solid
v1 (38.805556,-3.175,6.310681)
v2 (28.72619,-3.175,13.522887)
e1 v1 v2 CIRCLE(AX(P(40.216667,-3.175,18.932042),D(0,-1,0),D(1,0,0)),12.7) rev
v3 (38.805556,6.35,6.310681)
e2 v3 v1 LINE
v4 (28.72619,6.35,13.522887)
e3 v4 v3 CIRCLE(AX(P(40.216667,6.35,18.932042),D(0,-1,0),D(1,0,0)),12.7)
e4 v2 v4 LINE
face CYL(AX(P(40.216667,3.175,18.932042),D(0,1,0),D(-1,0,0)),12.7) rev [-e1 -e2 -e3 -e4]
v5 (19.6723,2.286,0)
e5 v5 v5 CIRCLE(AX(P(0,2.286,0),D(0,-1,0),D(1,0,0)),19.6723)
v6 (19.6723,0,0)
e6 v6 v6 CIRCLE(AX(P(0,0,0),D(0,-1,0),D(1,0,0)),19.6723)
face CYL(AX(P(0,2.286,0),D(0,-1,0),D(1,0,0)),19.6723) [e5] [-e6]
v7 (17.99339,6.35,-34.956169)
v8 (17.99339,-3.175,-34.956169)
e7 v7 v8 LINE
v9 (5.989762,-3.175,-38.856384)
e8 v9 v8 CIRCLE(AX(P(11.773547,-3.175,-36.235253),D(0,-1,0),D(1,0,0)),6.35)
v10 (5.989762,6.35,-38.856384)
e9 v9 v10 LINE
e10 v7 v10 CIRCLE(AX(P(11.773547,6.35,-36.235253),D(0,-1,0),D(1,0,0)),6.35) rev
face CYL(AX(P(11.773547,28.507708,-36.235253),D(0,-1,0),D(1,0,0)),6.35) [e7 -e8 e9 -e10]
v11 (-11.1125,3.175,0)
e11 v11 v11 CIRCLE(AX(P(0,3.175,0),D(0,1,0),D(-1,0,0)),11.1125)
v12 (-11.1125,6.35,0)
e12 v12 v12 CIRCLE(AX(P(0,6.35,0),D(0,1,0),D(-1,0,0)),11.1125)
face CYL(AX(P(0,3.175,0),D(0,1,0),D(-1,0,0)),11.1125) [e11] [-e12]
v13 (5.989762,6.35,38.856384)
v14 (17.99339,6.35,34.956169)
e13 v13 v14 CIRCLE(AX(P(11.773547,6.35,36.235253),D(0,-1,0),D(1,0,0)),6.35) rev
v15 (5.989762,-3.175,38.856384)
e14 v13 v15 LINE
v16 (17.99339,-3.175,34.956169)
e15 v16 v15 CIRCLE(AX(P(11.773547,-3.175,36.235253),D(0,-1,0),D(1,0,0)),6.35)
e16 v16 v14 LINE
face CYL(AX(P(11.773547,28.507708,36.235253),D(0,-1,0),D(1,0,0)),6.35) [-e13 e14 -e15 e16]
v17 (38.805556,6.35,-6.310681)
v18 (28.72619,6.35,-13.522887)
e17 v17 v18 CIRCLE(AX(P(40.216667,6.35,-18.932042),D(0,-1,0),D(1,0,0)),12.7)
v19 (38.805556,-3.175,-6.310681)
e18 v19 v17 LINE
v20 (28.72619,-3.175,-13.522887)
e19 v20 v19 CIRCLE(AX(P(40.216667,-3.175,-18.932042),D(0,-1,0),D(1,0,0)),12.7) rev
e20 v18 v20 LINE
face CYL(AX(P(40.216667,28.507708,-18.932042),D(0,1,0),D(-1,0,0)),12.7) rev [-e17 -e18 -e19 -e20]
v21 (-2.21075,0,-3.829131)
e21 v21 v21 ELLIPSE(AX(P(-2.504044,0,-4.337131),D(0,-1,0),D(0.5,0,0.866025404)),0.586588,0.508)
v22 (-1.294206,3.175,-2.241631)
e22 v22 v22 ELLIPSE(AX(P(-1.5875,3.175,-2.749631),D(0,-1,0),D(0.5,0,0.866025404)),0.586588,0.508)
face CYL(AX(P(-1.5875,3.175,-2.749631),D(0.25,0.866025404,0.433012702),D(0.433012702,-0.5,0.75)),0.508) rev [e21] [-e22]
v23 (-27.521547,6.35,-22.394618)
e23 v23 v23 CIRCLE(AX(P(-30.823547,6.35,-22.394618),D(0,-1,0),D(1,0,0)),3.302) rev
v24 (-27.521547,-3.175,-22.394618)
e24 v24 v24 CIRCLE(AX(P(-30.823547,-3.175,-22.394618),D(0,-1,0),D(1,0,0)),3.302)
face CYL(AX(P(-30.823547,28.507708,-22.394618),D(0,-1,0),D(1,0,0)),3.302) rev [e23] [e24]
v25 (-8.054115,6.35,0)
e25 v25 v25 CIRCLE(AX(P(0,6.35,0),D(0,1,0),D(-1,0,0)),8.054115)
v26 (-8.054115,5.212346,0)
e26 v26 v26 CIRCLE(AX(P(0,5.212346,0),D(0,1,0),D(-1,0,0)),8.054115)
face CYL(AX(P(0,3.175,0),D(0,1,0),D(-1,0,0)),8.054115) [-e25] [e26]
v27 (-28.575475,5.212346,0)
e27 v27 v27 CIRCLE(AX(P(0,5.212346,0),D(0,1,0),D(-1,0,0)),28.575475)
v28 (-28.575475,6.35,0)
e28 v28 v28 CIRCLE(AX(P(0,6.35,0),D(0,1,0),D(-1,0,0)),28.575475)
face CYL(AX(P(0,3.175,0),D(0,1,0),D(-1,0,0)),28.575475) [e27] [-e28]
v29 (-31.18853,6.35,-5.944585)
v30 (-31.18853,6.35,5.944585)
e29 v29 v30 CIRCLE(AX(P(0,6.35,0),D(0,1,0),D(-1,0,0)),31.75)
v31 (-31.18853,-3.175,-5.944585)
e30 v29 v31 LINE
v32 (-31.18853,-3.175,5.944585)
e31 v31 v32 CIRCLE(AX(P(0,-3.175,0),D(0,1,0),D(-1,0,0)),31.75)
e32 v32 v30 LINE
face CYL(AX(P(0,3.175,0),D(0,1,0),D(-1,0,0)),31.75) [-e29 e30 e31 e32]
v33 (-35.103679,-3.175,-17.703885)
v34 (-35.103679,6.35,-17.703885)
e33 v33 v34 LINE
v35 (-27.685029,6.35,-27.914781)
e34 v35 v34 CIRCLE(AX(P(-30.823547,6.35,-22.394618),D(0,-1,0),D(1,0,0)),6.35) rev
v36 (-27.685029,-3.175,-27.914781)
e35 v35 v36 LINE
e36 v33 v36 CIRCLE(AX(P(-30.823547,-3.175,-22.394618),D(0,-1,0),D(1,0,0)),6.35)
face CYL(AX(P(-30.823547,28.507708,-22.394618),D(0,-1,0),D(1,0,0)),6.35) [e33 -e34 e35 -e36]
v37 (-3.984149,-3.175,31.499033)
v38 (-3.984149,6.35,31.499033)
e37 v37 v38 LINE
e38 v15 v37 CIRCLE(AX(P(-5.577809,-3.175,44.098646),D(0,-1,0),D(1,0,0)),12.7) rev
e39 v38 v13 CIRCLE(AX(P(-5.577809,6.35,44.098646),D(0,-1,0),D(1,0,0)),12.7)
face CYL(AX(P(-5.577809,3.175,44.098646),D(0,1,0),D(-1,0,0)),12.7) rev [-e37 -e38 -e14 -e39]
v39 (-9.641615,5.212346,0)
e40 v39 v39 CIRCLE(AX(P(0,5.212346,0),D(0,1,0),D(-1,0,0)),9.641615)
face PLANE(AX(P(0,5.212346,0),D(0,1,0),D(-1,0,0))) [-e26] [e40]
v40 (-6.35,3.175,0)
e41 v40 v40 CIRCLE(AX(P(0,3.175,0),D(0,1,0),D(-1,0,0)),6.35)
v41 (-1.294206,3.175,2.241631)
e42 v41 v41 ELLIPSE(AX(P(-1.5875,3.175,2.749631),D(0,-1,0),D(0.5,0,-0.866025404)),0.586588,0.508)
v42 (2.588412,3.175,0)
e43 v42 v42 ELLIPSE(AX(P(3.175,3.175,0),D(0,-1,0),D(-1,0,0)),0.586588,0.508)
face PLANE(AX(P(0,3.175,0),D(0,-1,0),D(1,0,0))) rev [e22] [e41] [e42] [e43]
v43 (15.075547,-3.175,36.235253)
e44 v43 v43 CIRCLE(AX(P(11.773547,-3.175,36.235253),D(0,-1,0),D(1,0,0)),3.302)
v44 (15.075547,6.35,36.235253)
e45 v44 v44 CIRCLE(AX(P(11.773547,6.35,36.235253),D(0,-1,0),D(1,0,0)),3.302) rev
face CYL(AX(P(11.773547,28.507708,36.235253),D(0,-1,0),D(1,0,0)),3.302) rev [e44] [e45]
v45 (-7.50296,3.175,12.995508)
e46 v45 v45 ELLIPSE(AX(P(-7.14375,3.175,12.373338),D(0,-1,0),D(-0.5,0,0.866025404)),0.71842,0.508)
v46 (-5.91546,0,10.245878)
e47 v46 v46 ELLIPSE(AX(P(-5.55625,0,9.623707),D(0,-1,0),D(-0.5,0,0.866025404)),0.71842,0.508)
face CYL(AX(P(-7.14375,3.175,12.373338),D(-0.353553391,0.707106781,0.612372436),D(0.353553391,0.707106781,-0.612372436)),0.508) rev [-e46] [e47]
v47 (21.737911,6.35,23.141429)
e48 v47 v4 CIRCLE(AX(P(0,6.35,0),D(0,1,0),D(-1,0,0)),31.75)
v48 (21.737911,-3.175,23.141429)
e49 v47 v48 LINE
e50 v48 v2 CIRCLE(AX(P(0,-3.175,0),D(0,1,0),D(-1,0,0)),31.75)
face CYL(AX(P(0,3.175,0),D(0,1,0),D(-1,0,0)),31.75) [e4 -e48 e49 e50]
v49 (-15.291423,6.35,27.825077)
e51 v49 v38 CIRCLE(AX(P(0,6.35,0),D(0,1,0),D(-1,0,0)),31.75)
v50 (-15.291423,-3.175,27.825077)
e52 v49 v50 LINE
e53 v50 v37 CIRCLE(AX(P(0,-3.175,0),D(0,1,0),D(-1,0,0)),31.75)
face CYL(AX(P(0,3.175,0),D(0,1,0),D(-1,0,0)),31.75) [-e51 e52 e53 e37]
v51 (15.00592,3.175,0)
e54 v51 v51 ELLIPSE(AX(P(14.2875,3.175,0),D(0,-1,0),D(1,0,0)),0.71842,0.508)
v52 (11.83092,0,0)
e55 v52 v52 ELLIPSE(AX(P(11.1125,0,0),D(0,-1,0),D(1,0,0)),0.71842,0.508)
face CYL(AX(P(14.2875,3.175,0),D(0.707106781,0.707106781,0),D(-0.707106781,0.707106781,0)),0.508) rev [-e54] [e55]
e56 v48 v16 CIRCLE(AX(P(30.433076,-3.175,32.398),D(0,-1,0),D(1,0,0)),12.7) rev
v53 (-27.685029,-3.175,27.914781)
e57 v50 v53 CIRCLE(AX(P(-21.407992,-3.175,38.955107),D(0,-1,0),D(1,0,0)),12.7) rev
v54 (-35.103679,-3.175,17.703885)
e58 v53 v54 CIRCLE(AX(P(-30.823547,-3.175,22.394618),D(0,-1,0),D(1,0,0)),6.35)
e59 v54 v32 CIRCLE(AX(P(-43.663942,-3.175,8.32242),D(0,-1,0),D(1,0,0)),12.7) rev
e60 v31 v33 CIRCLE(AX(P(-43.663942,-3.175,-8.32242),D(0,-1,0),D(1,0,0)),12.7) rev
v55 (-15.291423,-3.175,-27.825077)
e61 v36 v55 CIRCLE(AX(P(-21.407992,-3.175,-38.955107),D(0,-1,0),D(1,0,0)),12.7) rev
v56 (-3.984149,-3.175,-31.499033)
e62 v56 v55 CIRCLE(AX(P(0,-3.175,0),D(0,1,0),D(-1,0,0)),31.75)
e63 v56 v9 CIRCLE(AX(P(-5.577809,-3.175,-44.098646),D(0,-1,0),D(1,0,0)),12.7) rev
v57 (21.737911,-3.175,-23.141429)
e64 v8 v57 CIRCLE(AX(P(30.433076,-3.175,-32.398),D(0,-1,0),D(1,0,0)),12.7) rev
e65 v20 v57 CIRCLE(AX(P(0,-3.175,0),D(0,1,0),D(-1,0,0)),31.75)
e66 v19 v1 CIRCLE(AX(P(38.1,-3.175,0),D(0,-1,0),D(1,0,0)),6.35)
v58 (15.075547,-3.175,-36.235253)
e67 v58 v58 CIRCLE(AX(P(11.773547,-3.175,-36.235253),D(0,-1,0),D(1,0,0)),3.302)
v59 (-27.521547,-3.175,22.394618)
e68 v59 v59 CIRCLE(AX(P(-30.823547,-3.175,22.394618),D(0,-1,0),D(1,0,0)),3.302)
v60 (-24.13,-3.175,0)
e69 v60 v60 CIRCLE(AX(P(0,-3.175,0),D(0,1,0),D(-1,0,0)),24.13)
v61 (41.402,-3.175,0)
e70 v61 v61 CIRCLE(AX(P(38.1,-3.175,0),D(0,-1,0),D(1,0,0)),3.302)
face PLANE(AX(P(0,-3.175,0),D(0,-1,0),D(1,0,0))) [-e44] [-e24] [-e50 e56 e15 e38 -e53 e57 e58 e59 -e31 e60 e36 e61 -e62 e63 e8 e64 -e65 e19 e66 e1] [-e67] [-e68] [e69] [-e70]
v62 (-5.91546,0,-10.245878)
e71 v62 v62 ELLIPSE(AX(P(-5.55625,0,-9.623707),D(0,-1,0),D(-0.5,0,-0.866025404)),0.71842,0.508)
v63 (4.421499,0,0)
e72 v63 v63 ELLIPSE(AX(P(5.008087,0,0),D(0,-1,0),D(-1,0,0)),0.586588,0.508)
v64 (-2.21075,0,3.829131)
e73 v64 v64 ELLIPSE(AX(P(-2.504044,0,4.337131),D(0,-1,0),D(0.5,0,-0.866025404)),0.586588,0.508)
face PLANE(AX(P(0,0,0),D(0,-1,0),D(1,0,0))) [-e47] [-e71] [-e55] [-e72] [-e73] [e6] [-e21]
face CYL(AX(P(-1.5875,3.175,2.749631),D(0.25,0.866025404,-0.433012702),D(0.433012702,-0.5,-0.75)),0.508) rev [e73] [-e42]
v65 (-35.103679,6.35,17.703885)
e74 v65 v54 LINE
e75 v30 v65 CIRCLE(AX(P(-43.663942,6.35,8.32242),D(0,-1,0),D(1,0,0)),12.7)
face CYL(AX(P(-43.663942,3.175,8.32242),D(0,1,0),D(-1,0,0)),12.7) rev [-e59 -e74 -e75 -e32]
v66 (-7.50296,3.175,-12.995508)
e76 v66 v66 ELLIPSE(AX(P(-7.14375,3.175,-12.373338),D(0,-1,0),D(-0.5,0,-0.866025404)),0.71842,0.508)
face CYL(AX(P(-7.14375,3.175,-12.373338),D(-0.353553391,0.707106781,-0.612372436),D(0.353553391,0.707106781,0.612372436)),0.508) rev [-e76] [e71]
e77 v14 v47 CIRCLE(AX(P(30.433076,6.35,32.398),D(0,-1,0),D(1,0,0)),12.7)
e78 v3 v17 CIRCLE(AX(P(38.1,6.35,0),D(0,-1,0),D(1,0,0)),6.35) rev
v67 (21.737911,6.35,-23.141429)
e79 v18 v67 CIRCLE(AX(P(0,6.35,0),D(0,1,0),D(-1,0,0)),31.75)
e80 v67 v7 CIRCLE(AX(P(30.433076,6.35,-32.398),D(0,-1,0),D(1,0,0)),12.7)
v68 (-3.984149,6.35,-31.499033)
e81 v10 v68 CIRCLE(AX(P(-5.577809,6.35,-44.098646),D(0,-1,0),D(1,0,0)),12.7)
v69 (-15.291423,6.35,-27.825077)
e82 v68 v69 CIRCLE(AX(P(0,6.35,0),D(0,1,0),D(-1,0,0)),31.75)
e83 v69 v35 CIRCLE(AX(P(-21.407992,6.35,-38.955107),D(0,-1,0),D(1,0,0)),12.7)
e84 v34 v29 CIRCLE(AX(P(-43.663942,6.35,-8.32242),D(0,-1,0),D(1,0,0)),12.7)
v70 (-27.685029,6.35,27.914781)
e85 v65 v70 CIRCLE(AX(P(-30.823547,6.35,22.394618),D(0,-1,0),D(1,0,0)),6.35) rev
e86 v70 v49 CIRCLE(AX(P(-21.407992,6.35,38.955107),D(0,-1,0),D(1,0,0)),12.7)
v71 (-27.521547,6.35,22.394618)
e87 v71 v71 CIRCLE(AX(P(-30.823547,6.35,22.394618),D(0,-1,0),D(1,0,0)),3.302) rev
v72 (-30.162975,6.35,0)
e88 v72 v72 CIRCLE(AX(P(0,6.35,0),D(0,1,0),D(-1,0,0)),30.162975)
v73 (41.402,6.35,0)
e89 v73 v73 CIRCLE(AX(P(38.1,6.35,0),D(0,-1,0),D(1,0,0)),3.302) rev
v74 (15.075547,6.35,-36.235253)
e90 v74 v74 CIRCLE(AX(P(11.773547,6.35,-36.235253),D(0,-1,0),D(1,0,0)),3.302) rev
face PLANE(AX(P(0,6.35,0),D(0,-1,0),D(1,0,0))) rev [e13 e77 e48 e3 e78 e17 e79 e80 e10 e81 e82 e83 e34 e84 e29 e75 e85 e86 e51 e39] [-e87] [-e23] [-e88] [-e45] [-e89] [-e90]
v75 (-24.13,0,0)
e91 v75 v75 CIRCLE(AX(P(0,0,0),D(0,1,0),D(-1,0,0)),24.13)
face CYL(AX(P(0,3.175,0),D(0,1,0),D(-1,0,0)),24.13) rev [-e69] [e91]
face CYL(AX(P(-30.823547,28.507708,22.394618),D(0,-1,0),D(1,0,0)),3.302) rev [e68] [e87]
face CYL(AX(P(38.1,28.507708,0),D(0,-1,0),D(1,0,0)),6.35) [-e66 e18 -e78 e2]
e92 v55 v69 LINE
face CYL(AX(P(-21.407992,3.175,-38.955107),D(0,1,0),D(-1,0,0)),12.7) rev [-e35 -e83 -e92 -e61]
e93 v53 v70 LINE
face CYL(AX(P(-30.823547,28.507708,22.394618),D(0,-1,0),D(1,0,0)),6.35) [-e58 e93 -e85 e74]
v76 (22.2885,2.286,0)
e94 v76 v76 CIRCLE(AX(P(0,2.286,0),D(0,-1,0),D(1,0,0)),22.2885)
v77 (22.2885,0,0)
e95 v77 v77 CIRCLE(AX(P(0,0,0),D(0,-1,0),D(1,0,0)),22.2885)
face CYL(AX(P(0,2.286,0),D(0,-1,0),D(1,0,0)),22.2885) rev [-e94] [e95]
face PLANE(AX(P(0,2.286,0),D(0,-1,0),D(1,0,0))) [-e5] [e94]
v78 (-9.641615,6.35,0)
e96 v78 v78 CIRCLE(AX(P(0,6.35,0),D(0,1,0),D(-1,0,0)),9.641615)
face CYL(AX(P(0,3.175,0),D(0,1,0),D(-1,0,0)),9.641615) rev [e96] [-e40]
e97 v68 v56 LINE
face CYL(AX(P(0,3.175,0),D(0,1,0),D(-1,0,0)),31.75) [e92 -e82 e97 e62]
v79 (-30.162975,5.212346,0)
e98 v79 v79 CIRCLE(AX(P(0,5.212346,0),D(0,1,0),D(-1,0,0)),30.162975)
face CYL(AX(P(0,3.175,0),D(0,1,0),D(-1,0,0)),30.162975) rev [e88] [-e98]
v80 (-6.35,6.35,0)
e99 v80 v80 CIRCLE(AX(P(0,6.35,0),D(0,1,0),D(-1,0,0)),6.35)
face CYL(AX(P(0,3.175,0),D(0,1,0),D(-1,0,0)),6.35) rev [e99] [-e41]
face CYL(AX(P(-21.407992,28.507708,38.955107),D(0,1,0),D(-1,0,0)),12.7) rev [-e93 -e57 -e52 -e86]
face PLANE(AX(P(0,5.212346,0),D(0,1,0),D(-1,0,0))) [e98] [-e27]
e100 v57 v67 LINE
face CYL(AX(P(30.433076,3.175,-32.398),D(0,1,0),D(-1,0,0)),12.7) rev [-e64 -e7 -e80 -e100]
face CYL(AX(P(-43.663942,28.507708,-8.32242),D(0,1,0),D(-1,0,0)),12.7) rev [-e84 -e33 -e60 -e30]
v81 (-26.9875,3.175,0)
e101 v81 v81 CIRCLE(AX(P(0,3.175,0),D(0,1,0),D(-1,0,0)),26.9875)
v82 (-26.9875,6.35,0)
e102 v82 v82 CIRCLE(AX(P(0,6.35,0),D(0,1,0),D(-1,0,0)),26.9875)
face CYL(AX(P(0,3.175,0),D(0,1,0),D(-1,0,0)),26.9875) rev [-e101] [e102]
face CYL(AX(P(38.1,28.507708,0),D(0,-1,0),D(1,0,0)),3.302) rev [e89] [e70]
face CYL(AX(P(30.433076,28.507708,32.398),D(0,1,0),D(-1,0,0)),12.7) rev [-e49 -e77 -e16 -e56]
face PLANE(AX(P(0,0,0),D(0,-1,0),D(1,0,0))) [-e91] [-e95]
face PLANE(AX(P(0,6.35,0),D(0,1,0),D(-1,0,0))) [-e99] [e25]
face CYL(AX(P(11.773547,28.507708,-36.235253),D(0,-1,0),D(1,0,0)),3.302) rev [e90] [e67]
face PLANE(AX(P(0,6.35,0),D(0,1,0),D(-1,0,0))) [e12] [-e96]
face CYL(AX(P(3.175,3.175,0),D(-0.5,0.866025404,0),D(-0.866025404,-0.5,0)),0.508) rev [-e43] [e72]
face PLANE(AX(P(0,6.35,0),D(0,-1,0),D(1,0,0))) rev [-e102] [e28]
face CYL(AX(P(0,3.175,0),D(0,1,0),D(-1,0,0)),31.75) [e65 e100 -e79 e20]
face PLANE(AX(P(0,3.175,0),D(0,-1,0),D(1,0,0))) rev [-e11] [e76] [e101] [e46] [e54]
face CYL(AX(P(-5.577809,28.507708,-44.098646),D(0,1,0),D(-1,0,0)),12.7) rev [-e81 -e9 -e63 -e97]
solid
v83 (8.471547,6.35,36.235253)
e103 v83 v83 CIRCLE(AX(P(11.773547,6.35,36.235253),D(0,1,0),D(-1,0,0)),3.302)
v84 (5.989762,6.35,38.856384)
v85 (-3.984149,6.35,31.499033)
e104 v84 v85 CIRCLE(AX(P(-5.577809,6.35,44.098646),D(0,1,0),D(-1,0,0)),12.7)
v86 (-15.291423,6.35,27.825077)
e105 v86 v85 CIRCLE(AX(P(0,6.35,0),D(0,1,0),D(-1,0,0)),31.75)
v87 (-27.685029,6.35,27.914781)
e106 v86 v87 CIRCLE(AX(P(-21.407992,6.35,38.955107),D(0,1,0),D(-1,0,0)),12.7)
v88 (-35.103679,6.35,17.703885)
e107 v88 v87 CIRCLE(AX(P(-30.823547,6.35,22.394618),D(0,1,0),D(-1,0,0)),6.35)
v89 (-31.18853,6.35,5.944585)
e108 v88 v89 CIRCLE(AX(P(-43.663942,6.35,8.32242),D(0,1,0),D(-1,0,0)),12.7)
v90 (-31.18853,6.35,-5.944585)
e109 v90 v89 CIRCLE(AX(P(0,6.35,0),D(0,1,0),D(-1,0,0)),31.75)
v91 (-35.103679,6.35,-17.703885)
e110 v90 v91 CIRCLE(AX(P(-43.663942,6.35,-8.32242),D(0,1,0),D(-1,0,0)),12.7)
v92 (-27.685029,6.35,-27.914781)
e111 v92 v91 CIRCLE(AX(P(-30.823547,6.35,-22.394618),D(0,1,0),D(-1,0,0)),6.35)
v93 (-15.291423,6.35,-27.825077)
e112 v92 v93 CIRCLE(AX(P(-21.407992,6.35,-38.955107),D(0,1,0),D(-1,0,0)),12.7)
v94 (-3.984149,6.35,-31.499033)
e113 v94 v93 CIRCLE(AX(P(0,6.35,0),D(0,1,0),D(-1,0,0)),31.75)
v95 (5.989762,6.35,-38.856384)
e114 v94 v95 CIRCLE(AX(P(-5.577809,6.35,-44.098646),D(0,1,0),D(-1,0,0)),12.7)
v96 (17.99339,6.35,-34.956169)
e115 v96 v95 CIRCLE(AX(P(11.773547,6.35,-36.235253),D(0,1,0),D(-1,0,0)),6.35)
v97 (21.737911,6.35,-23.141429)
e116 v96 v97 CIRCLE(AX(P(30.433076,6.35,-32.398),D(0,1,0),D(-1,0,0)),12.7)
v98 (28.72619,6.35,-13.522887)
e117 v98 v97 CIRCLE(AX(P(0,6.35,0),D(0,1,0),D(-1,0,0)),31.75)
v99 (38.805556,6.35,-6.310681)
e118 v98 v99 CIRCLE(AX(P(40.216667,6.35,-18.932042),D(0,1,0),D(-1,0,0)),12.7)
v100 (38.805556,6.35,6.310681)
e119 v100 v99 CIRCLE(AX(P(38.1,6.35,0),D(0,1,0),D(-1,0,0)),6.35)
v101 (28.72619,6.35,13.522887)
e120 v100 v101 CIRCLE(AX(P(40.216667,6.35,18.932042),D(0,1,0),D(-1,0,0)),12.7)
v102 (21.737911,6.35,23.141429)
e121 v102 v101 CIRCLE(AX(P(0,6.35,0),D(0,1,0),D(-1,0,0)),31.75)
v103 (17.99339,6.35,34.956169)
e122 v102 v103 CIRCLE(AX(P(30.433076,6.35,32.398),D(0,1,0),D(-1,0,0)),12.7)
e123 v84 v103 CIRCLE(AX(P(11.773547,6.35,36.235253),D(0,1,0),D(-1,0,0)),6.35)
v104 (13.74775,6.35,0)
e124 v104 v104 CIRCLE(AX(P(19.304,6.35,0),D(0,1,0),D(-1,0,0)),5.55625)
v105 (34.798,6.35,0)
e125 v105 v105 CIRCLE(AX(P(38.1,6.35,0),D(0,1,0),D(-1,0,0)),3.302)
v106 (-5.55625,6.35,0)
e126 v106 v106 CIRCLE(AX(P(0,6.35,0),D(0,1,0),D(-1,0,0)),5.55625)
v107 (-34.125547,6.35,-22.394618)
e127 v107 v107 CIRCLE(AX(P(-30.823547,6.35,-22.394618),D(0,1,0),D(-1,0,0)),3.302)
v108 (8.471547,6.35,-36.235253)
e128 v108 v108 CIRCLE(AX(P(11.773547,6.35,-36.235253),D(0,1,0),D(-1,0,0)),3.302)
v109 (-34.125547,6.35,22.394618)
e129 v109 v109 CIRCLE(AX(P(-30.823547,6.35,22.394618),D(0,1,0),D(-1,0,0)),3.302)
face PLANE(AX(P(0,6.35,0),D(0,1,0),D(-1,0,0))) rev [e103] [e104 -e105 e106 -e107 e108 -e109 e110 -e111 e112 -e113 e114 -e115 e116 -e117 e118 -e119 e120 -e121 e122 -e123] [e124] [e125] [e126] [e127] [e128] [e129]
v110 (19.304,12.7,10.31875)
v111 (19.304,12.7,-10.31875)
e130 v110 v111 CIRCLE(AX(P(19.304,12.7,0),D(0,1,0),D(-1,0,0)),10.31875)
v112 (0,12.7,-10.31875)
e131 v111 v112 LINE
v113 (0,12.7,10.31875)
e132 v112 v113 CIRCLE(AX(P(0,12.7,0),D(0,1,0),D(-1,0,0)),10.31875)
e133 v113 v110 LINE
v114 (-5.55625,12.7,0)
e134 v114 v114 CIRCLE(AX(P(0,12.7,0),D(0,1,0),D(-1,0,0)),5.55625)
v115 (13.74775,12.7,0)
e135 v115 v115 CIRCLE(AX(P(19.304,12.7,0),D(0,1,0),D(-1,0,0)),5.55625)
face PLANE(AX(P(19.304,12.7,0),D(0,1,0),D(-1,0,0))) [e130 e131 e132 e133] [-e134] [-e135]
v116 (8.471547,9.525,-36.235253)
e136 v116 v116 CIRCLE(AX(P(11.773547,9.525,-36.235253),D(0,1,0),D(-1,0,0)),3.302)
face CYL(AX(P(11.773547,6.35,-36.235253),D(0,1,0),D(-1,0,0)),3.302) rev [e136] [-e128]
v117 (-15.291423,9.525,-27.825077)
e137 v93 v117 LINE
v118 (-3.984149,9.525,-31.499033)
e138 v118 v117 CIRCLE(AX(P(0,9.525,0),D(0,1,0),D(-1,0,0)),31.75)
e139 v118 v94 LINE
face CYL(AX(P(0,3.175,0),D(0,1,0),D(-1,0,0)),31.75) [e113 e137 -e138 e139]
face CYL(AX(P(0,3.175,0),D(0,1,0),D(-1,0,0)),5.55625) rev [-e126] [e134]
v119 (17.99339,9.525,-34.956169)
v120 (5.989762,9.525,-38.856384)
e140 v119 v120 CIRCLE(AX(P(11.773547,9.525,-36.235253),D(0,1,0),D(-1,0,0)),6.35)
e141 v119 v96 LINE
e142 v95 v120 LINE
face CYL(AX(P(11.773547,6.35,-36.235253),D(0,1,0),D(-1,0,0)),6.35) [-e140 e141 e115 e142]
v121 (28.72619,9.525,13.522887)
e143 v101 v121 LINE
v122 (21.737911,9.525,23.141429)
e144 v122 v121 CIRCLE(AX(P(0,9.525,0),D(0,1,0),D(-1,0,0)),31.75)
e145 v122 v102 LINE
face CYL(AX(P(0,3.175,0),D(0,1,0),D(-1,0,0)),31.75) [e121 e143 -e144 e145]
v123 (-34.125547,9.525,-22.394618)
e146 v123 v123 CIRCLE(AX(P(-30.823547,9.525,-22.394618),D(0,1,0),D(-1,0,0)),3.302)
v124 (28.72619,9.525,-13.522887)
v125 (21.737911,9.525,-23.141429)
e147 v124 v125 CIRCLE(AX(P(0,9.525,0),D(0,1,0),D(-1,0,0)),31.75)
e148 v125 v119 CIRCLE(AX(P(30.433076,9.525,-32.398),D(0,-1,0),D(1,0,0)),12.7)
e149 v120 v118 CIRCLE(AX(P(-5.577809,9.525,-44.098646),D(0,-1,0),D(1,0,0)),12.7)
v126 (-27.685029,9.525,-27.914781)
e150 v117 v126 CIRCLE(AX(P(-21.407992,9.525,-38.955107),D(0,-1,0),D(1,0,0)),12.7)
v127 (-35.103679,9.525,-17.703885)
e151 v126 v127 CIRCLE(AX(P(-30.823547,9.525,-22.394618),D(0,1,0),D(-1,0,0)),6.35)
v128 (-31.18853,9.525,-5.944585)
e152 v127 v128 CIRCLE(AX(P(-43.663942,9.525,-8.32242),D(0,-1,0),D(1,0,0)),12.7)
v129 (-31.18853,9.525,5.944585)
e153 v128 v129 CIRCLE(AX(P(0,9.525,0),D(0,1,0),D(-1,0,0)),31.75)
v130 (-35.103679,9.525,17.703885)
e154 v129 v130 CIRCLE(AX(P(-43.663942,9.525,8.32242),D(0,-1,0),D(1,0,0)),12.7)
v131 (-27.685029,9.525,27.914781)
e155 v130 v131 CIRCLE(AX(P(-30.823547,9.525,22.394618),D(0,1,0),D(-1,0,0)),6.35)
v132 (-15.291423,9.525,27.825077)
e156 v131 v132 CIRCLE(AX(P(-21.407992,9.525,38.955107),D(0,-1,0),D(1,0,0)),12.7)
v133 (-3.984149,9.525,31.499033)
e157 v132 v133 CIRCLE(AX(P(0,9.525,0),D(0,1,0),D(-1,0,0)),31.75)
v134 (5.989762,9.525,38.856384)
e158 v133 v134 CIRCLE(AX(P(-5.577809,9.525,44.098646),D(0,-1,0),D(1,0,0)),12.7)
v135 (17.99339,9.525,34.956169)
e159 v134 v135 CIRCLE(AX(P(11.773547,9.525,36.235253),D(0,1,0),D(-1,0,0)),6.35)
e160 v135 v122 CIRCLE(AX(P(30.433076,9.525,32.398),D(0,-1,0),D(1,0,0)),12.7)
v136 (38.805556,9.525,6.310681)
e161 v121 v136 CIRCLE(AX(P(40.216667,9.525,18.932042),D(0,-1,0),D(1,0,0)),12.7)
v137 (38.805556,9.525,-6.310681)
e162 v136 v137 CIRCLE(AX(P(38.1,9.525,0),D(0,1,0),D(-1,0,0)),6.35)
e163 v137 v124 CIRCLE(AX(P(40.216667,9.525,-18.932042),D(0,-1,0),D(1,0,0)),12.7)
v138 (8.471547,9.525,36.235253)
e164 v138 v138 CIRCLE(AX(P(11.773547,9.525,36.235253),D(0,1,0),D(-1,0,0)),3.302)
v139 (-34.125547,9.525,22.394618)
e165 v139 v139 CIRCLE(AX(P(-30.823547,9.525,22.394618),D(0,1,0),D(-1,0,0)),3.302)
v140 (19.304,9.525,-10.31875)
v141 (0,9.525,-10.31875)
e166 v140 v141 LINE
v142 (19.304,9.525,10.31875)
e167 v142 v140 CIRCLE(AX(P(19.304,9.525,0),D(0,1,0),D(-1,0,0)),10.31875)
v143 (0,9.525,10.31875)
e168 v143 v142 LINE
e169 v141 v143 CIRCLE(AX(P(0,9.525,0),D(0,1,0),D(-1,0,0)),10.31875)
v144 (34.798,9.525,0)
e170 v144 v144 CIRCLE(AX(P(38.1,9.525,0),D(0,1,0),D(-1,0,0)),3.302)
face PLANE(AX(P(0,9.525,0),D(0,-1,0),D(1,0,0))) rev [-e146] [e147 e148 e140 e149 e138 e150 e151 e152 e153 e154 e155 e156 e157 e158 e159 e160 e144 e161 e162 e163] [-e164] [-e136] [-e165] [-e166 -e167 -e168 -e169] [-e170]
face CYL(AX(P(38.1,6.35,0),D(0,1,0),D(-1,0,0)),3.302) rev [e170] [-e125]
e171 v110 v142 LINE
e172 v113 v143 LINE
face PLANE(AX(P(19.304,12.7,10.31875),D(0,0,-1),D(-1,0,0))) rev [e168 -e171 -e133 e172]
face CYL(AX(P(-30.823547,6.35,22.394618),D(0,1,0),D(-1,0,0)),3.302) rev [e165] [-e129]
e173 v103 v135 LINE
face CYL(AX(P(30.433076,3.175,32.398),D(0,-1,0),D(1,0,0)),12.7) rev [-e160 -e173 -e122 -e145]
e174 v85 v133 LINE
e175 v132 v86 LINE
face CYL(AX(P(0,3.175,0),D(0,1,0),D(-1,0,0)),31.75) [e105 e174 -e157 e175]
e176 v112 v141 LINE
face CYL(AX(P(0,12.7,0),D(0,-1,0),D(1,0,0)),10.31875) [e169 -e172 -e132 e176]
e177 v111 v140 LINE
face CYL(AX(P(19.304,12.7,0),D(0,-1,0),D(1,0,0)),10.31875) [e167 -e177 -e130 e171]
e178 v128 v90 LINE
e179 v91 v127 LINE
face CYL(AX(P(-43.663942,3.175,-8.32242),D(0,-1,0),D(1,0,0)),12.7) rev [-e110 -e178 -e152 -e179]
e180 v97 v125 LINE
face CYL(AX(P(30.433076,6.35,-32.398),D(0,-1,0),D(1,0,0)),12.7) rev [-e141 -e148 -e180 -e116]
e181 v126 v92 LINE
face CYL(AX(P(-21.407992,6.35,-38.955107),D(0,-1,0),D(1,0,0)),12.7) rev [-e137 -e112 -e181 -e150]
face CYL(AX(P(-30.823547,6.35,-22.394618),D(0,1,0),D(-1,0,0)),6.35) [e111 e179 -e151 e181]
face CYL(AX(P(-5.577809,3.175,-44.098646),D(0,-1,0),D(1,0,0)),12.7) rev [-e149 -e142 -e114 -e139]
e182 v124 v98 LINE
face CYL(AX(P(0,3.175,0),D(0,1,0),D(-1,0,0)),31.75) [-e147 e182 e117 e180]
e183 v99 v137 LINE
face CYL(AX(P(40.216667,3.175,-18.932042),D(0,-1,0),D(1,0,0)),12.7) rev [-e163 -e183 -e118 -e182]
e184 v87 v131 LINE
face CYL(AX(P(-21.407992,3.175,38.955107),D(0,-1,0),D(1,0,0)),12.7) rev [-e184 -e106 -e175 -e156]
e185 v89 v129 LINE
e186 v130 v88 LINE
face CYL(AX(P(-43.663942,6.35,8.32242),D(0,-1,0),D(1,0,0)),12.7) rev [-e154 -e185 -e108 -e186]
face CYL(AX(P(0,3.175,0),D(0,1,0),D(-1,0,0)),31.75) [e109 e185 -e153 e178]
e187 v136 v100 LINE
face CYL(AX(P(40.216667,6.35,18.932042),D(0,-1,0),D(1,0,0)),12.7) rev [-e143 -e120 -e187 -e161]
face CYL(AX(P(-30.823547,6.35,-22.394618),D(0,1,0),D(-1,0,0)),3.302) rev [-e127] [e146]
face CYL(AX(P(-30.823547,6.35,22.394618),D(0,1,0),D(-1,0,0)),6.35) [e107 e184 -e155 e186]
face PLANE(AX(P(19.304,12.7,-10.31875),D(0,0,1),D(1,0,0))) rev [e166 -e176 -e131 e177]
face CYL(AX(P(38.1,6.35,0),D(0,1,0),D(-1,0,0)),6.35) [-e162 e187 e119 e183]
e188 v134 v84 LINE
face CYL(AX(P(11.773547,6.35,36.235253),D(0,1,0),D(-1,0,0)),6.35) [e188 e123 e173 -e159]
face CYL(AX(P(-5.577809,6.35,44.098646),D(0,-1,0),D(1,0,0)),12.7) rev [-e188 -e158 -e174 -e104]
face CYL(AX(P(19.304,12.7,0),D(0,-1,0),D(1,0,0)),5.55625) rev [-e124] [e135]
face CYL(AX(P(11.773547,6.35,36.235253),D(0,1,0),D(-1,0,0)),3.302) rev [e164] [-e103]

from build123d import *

# Parameters (mm, degrees)
SKETCH1_W           = 7.62
SKETCH1_H           = 3.175
SKETCH2_R           = 3.302
BOSS_EXTRUDE1_DEPTH = 3.175
BOSS_EXTRUDE2_START = -3.175
SKETCH2_4_R         = 3.302
BOSS_EXTRUDE2_DEPTH = 9.525
FILLET1_R           = 12.7
CIRPATTERN1_COUNT   = 3
SKETCH3_R           = 5.55625
BOSS_EXTRUDE3_DEPTH = 3.175
SKETCH3_3_R         = 5.55625
CUT_EXTRUDE1_DEPTH  = 3.175
FILLET3_R           = 12.7
SKETCH4_R           = 22.2885
SKETCH4_R_2         = 19.6723
CUT_EXTRUDE3_DEPTH  = 2.286


with BuildPart() as part:
    # Sketch1 → Revolve1 (revolve)
    with BuildSketch(Plane.XY, mode=Mode.PRIVATE) as revolve1_sk:
        Polygon((0, 0), (4.421499231, 0), (2.588412127, 3.175), (0, 3.175), align=None)
        Polygon((4.421499231, 0), (5.008087105, 0), (3.175, 3.175), (2.588412127, 3.175), align=None)
        Polygon((5.008087105, 0), (5.594674978, 0), (3.761587873, 3.175), (3.175, 3.175), align=None)
        Polygon((10.39407951, 0), (13.56907951, 3.175), (11.1125, 3.175), (6.35, 3.175), (3.761587873, 3.175), (5.594674978, 0), align=None)
        Polygon((11.1125, 3.175), (11.1125, 6.35), (9.641614902, 6.35), (9.641614902, 5.212346408), (8.054114902, 5.212346408), (8.054114902, 6.35), (6.35, 6.35), (6.35, 3.175), align=None)
        Polygon((11.1125, 0), (14.2875, 3.175), (13.56907951, 3.175), (10.39407951, 0), align=None)
        Polygon((11.83092049, 0), (15.00592049, 3.175), (14.2875, 3.175), (11.1125, 0), align=None)
        Polygon((31.75, 0), (31.75, 3.175), (26.9875, 3.175), (15.00592049, 3.175), (11.83092049, 0), (24.13, 0), align=None)
        Polygon((26.9875, 3.175), (31.75, 3.175), (31.75, 6.35), (30.162975205, 6.35), (30.162975205, 5.212346408), (28.575475205, 5.212346408), (28.575475205, 6.35), (26.9875, 6.35), align=None)
        with Locations((27.94, -1.5875)):
            Rectangle(SKETCH1_W, SKETCH1_H)
    revolve(revolve1_sk.sketch.rotate(Axis((0, 3.175, 0), (0, -1, 0)), 180), axis=Axis((0, 3.175, 0), (0, -1, 0)))

    # Sketch2<4> → Boss-Extrude2 (add)
    # profile 1 of 5: a face of its own
    with BuildSketch(Plane(origin=(0, 9.525, 0), x_dir=(1, 0, 0), z_dir=(0, 1, 0)).offset(BOSS_EXTRUDE2_START)):
        with BuildLine():
            ThreePointArc((31.108519733, 6.35), (31.75, 0), (31.108519733, -6.35))
            Line((31.108519733, -6.35), (38.1, -6.35))
            ThreePointArc((38.1, -6.35), (44.45, 0), (38.1, 6.35))
            Line((38.1, 6.35), (31.108519733, 6.35))
        make_face()
        with Locations(Location((38.1, 0, 0), (0, 0, 180))):
            Circle(SKETCH2_4_R, mode=Mode.SUBTRACT)
    # profile 2 of 5: a face of its own
    with BuildSketch(Plane(origin=(0, 9.525, 0), x_dir=(1, 0, 0), z_dir=(0, 1, 0)).offset(BOSS_EXTRUDE2_START)):
        with BuildLine():
            Line((15.652270146, 27.62370249), (17.812756364, 34.272995357))
            ThreePointArc((17.812756364, 34.272995357), (13.7358054, 42.274462149), (5.734338607, 38.197511185))
            Line((5.734338607, 38.197511185), (3.573852389, 31.548218319))
            ThreePointArc((3.573852389, 31.548218319), (9.811289571, 30.196044392), (15.652270146, 27.62370249))
        make_face()
        with Locations(Location((11.773547486, 36.235253271, 0), (0, 0, 180))):
            Circle(SKETCH2_4_R, mode=Mode.SUBTRACT)
    # profile 3 of 5: a face of its own
    with BuildSketch(Plane(origin=(0, 9.525, 0), x_dir=(1, 0, 0), z_dir=(0, 1, 0)).offset(BOSS_EXTRUDE2_START)):
        with BuildLine():
            Line((17.812756364, -34.272995357), (15.652270146, -27.62370249))
            ThreePointArc((15.652270146, -27.62370249), (9.811289571, -30.196044392), (3.573852389, -31.548218319))
            Line((3.573852389, -31.548218319), (5.734338607, -38.197511185))
            ThreePointArc((5.734338607, -38.197511185), (13.7358054, -42.274462149), (17.812756364, -34.272995357))
        make_face()
        with Locations(Location((11.773547486, -36.235253271, 0), (0, 0, 180))):
            Circle(SKETCH2_4_R, mode=Mode.SUBTRACT)
    # profile 4 of 5: a face of its own
    with BuildSketch(Plane(origin=(0, 9.525, 0), x_dir=(1, 0, 0), z_dir=(0, 1, 0)).offset(BOSS_EXTRUDE2_START)):
        with BuildLine():
            Line((-21.434884782, 23.422387034), (-27.091111134, 27.531876027))
            ThreePointArc((-27.091111134, 27.531876027), (-35.9608054, 26.127054464), (-34.555983838, 17.257360198))
            Line((-34.555983838, 17.257360198), (-28.899757486, 13.147871206))
            ThreePointArc((-28.899757486, 13.147871206), (-25.686289571, 18.66218176), (-21.434884782, 23.422387034))
        make_face()
        with Locations(Location((-30.823547486, 22.394618112, 0), (0, 0, 180))):
            Circle(SKETCH2_4_R, mode=Mode.SUBTRACT)
    # profile 5 of 5: a face of its own
    with BuildSketch(Plane(origin=(0, 9.525, 0), x_dir=(1, 0, 0), z_dir=(0, 1, 0)).offset(BOSS_EXTRUDE2_START)):
        with BuildLine():
            Line((-27.091111134, -27.531876027), (-21.434884782, -23.422387034))
            ThreePointArc((-21.434884782, -23.422387034), (-25.686289571, -18.66218176), (-28.899757486, -13.147871206))
            Line((-28.899757486, -13.147871206), (-34.555983838, -17.257360198))
            ThreePointArc((-34.555983838, -17.257360198), (-35.9608054, -26.127054464), (-27.091111134, -27.531876027))
        make_face()
        with Locations(Location((-30.823547486, -22.394618112, 0), (0, 0, 180))):
            Circle(SKETCH2_4_R, mode=Mode.SUBTRACT)
    extrude(amount=-BOSS_EXTRUDE2_DEPTH)

    # Sketch1<6> → Cut-Revolve1 (revolve, cut)
    with BuildSketch(Plane.XY):
        Polygon((11.83092049, 0), (15.00592049, 3.175), (14.2875, 3.175), (11.1125, 0), align=None)
        Polygon((11.1125, -0.71842049), (11.83092049, 0), (11.1125, 0), (10.753289755, -0.359210245), align=None)
    cut_revolve1 = revolve(axis=Axis((14.2875, 3.175, 0), (-0.7071067811865461, -0.707106781186549, 0)), mode=Mode.SUBTRACT)

    # Sketch1<7> → Cut-Revolve2 (revolve, cut)
    with BuildSketch(Plane.XY):
        Polygon((4.421499231, 0), (5.008087105, 0), (3.175, 3.175), (2.588412127, 3.175), align=None)
        Polygon((5.154734073, -0.254), (5.008087105, 0), (4.421499231, 0), (4.714793168, -0.508), align=None)
    cut_revolve2 = revolve(axis=Axis((3.175, 3.175, 0), (0.5000000000000047, -0.8660254037844359, 0)), mode=Mode.SUBTRACT)

    # CirPattern1: Cut-Revolve1, Cut-Revolve2 ×3 about axis
    cirpattern1_axis = Axis((0, -3.175, 0), (0, 1, 0))
    add([cut_revolve1.rotate(cirpattern1_axis, i * 360 / CIRPATTERN1_COUNT) for i in range(1, CIRPATTERN1_COUNT)], mode=Mode.SUBTRACT)
    add([cut_revolve2.rotate(cirpattern1_axis, i * 360 / CIRPATTERN1_COUNT) for i in range(1, CIRPATTERN1_COUNT)], mode=Mode.SUBTRACT)

    # Fillet3
    # the kernel refuses this fillet: 12.7 mm, written as the material it adds along each edge
    with BuildSketch(Plane(origin=(15.652270146, 6.35, -27.62370249), x_dir=(0.8051747766979301, 0, 0.5930375864727617), z_dir=(0, -1, 0)), Plane(origin=(31.108519733, 6.35, 6.35), x_dir=(-0.315199571581157, 0, 0.9490254106582474), z_dir=(0, -1, 0)), Plane(origin=(3.573852389, 6.35, 31.548218319), x_dir=(-0.9999788251744905, 0, -0.00650762649863798), z_dir=(0, -1, 0)), Plane(origin=(-28.899757486, 6.35, 13.147871206), x_dir=(-0.3028213304068675, 0, -0.9530473450204952), z_dir=(0, -1, 0)), Plane(origin=(-21.434884782, 6.35, -23.422387034), x_dir=(0.812824950464584, 0, -0.5825080256118763), z_dir=(0, -1, 0))) as fillet3_piece_1:
        with BuildLine():
            CenterArc((9.069793764, -12.609717198), FILLET3_R, 96.835903132, 58.411864495)
            Line((-2.463417374, -7.292289167), (-3.616738488, -6.760546364))
            ThreePointArc((-3.616738488, -6.760546364), (-3.408973856, -6.234788975), (-1.205262272, 0.400303456))
            Line((-1.205262272, 0.400303456), (0.151163229, 1.26097172))
            ThreePointArc((0.151163229, 1.26097172), (3.779080735, 1.044292994), (7.40699824, 1.26097172))
            Line((7.40699824, 1.26097172), (7.55816147, 0))
        make_face()
    extrude(amount=9.525)
    with BuildSketch(Plane(origin=(3.573852389, 6.35, -31.548218319), x_dir=(0.31387124232172303, 0, -0.9494655566387957), z_dir=(0, -1, 0)), Plane(origin=(31.108519733, 6.35, -6.35), x_dir=(0.9999869525621216, 0, 0.005108297712671891), z_dir=(0, -1, 0)), Plane(origin=(15.652270146, 6.35, 27.62370249), x_dir=(0.3041546826680995, 0, 0.95262265824988), z_dir=(0, -1, 0)), Plane(origin=(-21.434884782, 6.35, 23.422387034), x_dir=(-0.8120090208357984, 0, 0.58364488353903), z_dir=(0, -1, 0))) as fillet3_piece_2:
        with BuildLine():
            CenterArc((9.043755278, -12.628405172), FILLET3_R, 96.086685036, 58.411864495)
            Line((-2.418939418, -7.160624058), (-3.565208887, -6.613845946))
            ThreePointArc((-3.565208887, -6.613845946), (-2.198835915, -3.246092987), (-1.243027046, 0.260353149))
            Line((-1.243027046, 0.260353149), (0.006487538, 1.26998343))
            ThreePointArc((0.006487538, 1.26998343), (6.997876584, 1.234268867), (7.562474347, 1.262840517))
            Line((7.562474347, 1.262840517), (7.69713625, 0))
        make_face()
    extrude(amount=9.525)
    with BuildSketch(Plane(origin=(-28.899757486, 6.35, -13.147871206), x_dir=(-0.3028213304068674, 0, 0.9530473450204953), z_dir=(0, -1, 0))) as fillet3_piece_3:
        with BuildLine():
            CenterArc((9.069793764, 12.609717198), FILLET3_R, 204.752232373, 58.411864495)
            Line((-2.463417374, 7.292289167), (-3.616738488, 6.760546364))
            ThreePointArc((-3.616738488, 6.760546364), (-3.408973856, 6.234788975), (-1.205262272, -0.400303456))
            Line((-1.205262272, -0.400303456), (0.151163229, -1.26097172))
            ThreePointArc((0.151163229, -1.26097172), (3.779080735, -1.044292994), (7.40699824, -1.26097172))
            Line((7.40699824, -1.26097172), (7.55816147, 0))
        make_face()
    extrude(amount=9.525)

    # Sketch4 → Cut-Extrude3 (cut)
    with BuildSketch(Plane(origin=(0, 0, 0), x_dir=(-1, 0, 0), z_dir=(0, -1, 0))):
        with Locations(Location((0, 0, 0), (0, 0, 180))):
            Circle(SKETCH4_R)
        with Locations(Location((0, 0, 0), (0, 0, 180))):
            Circle(SKETCH4_R_2, mode=Mode.SUBTRACT)
    extrude(amount=-CUT_EXTRUDE3_DEPTH, mode=Mode.SUBTRACT)


with BuildPart() as body_2:
    # Sketch1<3> → Revolve2 (revolve)
    with BuildSketch(Plane.XY, mode=Mode.PRIVATE) as revolve2_sk:
        Polygon((6.35, 6.35), (11.1125, 6.35), (26.9875, 6.35), (31.75, 6.35), (31.75, 9.525), (5.55625, 9.525), (5.55625, 6.35), align=None)
    revolve(revolve2_sk.sketch.rotate(Axis((0, 3.175, 0), (0, -1, 0)), 180), axis=Axis((0, 3.175, 0), (0, -1, 0)))

    # Sketch2 → Boss-Extrude1 (add)
    # profile 1 of 5: a face of its own
    with BuildSketch(Plane(origin=(0, 9.525, 0), x_dir=(1, 0, 0), z_dir=(0, 1, 0))):
        with BuildLine():
            ThreePointArc((31.108519733, 6.35), (31.75, 0), (31.108519733, -6.35))
            Line((31.108519733, -6.35), (38.1, -6.35))
            ThreePointArc((38.1, -6.35), (44.45, 0), (38.1, 6.35))
            Line((38.1, 6.35), (31.108519733, 6.35))
        make_face()
        with Locations(Location((38.1, 0, 0), (0, 0, 180))):
            Circle(SKETCH2_R, mode=Mode.SUBTRACT)
    # profile 2 of 5: a face of its own
    with BuildSketch(Plane(origin=(0, 9.525, 0), x_dir=(1, 0, 0), z_dir=(0, 1, 0))):
        with BuildLine():
            Line((15.652270146, 27.62370249), (17.812756364, 34.272995357))
            ThreePointArc((17.812756364, 34.272995357), (13.7358054, 42.274462149), (5.734338607, 38.197511185))
            Line((5.734338607, 38.197511185), (3.573852389, 31.548218319))
            ThreePointArc((3.573852389, 31.548218319), (9.811289571, 30.196044392), (15.652270146, 27.62370249))
        make_face()
        with Locations(Location((11.773547486, 36.235253271, 0), (0, 0, 180))):
            Circle(SKETCH2_R, mode=Mode.SUBTRACT)
    # profile 3 of 5: a face of its own
    with BuildSketch(Plane(origin=(0, 9.525, 0), x_dir=(1, 0, 0), z_dir=(0, 1, 0))):
        with BuildLine():
            Line((17.812756364, -34.272995357), (15.652270146, -27.62370249))
            ThreePointArc((15.652270146, -27.62370249), (9.811289571, -30.196044392), (3.573852389, -31.548218319))
            Line((3.573852389, -31.548218319), (5.734338607, -38.197511185))
            ThreePointArc((5.734338607, -38.197511185), (13.7358054, -42.274462149), (17.812756364, -34.272995357))
        make_face()
        with Locations(Location((11.773547486, -36.235253271, 0), (0, 0, 180))):
            Circle(SKETCH2_R, mode=Mode.SUBTRACT)
    # profile 4 of 5: a face of its own
    with BuildSketch(Plane(origin=(0, 9.525, 0), x_dir=(1, 0, 0), z_dir=(0, 1, 0))):
        with BuildLine():
            Line((-21.434884782, 23.422387034), (-27.091111134, 27.531876027))
            ThreePointArc((-27.091111134, 27.531876027), (-35.9608054, 26.127054464), (-34.555983838, 17.257360198))
            Line((-34.555983838, 17.257360198), (-28.899757486, 13.147871206))
            ThreePointArc((-28.899757486, 13.147871206), (-25.686289571, 18.66218176), (-21.434884782, 23.422387034))
        make_face()
        with Locations(Location((-30.823547486, 22.394618112, 0), (0, 0, 180))):
            Circle(SKETCH2_R, mode=Mode.SUBTRACT)
    # profile 5 of 5: a face of its own
    with BuildSketch(Plane(origin=(0, 9.525, 0), x_dir=(1, 0, 0), z_dir=(0, 1, 0))):
        with BuildLine():
            Line((-27.091111134, -27.531876027), (-21.434884782, -23.422387034))
            ThreePointArc((-21.434884782, -23.422387034), (-25.686289571, -18.66218176), (-28.899757486, -13.147871206))
            Line((-28.899757486, -13.147871206), (-34.555983838, -17.257360198))
            ThreePointArc((-34.555983838, -17.257360198), (-35.9608054, -26.127054464), (-27.091111134, -27.531876027))
        make_face()
        with Locations(Location((-30.823547486, -22.394618112, 0), (0, 0, 180))):
            Circle(SKETCH2_R, mode=Mode.SUBTRACT)
    extrude(amount=-BOSS_EXTRUDE1_DEPTH)

    # Fillet1
    fillet1_edges = [body_2.edges().sort_by_distance(p)[0] for p in [
        (-21.434884782, 7.9375, 23.422387034),
        (3.573852389, 7.9375, 31.548218319),
        (15.652270146, 7.9375, 27.62370249),
        (31.108519733, 7.9375, 6.35),
        (31.108519733, 7.9375, -6.35),
        (15.652270146, 7.9375, -27.62370249),
        (3.573852389, 7.9375, -31.548218319),
        (-21.434884782, 7.9375, -23.422387034),
        (-28.899757486, 7.9375, 13.147871206),
        (-28.899757486, 7.9375, -13.147871206),
    ]]
    fillet(fillet1_edges, radius=FILLET1_R)

    # Sketch3 → Boss-Extrude3 (add)
    with BuildSketch(Plane(origin=(0, 9.525, 0), x_dir=(1, 0, 0), z_dir=(0, 1, 0))):
        with BuildLine():
            Line((19.304, 10.31875), (0, 10.31875))
            ThreePointArc((0, 10.31875), (-10.31875, 0), (0, -10.31875))
            Line((0, -10.31875), (19.304, -10.31875))
            ThreePointArc((19.304, -10.31875), (29.62275, 0), (19.304, 10.31875))
        make_face()
        with Locations(Location((19.304, 0, 0), (0, 0, 180))):
            Circle(SKETCH3_R, mode=Mode.SUBTRACT)
        with Locations(Location((0, 0, 0), (0, 0, 180))):
            Circle(SKETCH3_R, mode=Mode.SUBTRACT)
    extrude(amount=BOSS_EXTRUDE3_DEPTH)

    # Sketch3<3> → Cut-Extrude1 (cut)
    with BuildSketch(Plane(origin=(0, 9.525, 0), x_dir=(1, 0, 0), z_dir=(0, 1, 0))):
        with Locations(Location((19.304, 0, 0), (0, 0, 180))):
            Circle(SKETCH3_3_R)
    extrude(amount=-CUT_EXTRUDE1_DEPTH, mode=Mode.SUBTRACT)


solid = Compound([part.part, body_2.part])
